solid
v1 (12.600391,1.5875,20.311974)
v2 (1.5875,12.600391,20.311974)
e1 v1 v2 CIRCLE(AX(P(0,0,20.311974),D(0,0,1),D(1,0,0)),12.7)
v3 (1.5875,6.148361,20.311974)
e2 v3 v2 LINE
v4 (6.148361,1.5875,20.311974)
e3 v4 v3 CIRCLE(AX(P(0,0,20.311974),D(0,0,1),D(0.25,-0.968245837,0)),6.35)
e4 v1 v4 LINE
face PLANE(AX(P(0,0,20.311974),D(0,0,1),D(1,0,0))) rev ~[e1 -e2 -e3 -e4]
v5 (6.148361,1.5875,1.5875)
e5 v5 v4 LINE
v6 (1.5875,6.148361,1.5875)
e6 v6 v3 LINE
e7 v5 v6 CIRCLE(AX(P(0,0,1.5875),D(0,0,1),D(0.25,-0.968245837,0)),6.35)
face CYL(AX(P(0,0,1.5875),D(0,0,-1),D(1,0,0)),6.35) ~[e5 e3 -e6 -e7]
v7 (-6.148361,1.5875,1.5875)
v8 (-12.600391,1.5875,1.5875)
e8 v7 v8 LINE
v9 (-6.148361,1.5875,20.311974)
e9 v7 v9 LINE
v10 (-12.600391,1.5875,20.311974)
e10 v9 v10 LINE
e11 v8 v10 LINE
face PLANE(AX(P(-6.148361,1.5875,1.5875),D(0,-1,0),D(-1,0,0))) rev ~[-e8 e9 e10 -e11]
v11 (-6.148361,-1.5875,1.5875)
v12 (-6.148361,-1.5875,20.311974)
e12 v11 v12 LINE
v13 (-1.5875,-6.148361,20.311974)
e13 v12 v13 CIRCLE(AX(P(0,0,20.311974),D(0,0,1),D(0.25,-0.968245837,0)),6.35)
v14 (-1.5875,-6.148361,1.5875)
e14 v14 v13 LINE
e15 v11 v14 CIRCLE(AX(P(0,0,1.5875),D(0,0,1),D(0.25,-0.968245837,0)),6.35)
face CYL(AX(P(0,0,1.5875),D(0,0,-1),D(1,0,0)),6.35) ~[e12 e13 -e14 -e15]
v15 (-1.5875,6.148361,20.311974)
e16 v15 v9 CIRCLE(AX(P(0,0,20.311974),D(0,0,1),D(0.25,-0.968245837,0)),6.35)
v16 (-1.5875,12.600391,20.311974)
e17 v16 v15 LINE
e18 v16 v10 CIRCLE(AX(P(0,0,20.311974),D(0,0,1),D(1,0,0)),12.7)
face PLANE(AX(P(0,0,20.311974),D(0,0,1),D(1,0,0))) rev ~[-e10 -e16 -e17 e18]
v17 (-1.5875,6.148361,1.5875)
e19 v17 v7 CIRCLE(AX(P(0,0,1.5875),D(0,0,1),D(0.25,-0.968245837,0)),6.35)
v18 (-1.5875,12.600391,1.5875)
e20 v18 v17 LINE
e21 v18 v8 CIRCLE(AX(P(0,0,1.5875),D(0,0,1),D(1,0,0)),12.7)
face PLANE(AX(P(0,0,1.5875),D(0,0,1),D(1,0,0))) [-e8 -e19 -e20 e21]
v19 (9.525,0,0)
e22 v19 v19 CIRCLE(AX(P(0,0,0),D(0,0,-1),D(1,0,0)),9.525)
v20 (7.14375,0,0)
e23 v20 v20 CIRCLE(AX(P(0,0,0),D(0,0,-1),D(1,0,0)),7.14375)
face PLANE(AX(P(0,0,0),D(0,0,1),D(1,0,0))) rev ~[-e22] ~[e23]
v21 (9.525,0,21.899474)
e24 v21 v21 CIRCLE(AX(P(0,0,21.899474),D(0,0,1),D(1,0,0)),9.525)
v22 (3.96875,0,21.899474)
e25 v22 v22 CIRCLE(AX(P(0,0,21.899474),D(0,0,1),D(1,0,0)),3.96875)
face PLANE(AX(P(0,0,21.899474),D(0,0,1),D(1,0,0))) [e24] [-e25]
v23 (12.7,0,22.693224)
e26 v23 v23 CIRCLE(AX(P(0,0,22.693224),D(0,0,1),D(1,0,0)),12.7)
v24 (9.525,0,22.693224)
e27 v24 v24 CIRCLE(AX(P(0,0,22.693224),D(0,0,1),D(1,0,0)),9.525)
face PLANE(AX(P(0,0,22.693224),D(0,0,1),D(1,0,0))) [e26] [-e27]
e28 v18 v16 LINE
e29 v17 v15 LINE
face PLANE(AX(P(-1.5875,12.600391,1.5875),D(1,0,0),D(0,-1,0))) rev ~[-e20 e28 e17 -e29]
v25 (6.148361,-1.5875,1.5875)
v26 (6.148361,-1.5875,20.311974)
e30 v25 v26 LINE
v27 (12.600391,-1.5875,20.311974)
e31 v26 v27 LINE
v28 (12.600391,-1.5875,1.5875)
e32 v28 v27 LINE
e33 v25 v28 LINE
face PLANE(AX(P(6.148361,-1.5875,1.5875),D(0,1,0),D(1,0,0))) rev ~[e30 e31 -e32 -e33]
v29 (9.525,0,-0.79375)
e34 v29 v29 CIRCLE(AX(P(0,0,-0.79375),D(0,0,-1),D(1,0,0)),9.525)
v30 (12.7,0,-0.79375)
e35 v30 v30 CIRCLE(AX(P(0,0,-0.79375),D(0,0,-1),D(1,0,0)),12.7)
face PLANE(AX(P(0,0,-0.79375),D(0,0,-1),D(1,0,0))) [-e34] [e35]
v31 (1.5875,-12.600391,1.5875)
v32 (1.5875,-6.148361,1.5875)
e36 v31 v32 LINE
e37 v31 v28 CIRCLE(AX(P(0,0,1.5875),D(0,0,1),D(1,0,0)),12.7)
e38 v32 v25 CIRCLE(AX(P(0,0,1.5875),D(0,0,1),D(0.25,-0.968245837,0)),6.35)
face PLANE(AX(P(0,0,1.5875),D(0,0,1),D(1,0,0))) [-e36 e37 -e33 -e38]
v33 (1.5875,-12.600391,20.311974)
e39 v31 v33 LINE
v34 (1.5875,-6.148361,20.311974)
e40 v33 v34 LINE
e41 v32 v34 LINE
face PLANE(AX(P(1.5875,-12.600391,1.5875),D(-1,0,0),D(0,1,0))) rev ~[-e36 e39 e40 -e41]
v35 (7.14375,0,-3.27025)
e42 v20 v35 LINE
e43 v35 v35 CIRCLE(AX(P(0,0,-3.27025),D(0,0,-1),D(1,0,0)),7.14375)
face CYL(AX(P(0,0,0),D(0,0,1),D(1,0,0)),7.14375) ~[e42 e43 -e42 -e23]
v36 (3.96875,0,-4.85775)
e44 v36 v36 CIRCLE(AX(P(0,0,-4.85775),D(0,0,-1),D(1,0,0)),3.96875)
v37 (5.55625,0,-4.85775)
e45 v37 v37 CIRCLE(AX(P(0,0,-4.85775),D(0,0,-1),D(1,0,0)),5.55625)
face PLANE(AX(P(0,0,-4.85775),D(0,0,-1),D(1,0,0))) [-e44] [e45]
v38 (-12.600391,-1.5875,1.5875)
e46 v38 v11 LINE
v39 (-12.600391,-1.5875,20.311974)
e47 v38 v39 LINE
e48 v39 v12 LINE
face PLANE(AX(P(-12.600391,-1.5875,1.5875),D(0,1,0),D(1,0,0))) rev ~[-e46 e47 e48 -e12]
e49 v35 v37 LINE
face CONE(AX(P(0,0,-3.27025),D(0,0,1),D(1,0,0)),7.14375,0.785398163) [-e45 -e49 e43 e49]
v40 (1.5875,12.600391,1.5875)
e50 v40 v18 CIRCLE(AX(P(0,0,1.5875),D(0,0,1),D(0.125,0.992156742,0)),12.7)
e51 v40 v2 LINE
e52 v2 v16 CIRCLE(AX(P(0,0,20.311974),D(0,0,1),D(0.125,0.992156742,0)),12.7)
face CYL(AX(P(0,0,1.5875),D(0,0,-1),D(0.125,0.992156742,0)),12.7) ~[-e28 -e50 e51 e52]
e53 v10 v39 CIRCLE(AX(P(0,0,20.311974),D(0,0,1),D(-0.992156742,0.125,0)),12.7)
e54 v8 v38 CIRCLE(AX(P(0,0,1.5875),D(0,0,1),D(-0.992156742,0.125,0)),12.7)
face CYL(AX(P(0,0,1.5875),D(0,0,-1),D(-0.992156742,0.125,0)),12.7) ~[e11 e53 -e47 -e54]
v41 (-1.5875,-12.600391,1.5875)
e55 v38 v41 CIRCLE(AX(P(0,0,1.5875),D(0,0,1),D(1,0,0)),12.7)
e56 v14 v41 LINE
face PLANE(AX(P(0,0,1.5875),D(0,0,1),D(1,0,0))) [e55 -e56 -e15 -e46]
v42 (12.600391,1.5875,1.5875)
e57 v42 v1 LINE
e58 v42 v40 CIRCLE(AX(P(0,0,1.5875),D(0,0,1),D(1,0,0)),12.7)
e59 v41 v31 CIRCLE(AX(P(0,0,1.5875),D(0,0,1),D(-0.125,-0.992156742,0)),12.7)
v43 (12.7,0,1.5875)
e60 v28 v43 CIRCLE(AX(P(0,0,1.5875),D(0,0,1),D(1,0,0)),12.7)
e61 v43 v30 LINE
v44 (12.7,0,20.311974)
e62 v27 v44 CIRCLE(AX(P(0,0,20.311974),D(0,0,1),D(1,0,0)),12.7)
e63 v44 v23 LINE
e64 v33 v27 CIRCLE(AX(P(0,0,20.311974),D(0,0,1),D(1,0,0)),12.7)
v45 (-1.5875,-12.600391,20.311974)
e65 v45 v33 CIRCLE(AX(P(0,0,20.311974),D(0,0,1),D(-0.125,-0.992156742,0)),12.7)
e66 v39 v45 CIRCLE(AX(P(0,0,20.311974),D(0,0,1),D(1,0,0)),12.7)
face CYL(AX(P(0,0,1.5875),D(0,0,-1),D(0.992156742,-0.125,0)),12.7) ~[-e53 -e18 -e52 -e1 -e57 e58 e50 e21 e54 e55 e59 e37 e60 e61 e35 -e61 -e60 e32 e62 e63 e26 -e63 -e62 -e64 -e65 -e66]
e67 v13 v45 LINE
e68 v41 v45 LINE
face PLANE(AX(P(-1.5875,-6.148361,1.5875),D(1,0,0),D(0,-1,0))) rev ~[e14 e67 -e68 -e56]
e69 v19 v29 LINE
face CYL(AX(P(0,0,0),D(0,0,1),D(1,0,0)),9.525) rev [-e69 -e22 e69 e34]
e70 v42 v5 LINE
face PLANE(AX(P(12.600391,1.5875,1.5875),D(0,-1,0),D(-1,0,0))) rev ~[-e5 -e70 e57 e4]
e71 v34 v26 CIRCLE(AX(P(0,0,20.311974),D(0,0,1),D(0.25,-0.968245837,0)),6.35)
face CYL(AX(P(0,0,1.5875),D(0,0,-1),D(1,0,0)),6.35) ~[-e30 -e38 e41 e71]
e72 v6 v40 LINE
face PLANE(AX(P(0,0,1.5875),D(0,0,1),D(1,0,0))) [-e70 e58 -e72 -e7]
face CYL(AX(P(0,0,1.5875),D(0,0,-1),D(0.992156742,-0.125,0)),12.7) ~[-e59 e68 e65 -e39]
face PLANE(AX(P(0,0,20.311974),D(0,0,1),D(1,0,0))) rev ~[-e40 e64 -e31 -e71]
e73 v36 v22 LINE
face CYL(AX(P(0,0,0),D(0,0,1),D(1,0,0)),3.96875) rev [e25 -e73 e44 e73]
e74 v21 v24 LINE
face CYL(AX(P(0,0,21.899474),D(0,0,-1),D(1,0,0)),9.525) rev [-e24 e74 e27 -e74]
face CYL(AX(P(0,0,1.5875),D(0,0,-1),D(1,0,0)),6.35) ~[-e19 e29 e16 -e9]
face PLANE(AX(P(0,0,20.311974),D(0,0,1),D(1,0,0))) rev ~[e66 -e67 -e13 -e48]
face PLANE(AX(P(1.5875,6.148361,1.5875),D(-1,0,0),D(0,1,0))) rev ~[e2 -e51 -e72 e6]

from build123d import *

# Parameters (mm, degrees)
F0_R             = 12.7
F0_R_2           = 3.96875
F1_DEPTH         = 1.5875
F2_R             = 12.7
F2_R_2           = 9.525
F3_DEPTH         = 0.79375
F4_R             = 6.35
F4_R_2           = 3.96875
F5_DEPTH         = 18.7244736
F6_R             = 12.7
F6_R_2           = 3.96875
F7_DEPTH         = 1.5875
F8_R             = 12.7
F8_R_2           = 9.525
F9_DEPTH         = 0.79375
F11_DEPTH        = 18.7244736
F11_COPIES_COUNT = 4
F12_R            = 7.14375
F12_R_2          = 3.96875
F13_DEPTH        = 4.85775
F14_SIZE         = 1.5875


# Not quite as in the source:
# - a length typed as a fraction of an inch, garbled in the dataset ("3 / 203.2 mm" for 3/8 in), is restored
# - a pattern or mirror of a feature is missing from the dataset's text; its kind, count and spacing are read off the source's solid


with BuildPart() as f1:
    # F0 (on Top) → F1 (new body)
    with BuildSketch(Plane.XY):
        Circle(F0_R)
        Circle(F0_R_2, mode=Mode.SUBTRACT)
    extrude(amount=F1_DEPTH)

    # F2 (on face) → F3 (join)
    with BuildSketch(Plane(origin=(0, 0, 0), x_dir=(1, 0, 0), z_dir=(0, 0, -1))):
        Circle(F2_R)
        Circle(F2_R_2, mode=Mode.SUBTRACT)
    extrude(amount=F3_DEPTH)

    # F4 (on face) → F5 (join)
    with BuildSketch(Plane.XY.offset(1.5875)):
        Circle(F4_R)
        Circle(F4_R_2, mode=Mode.SUBTRACT)
    extrude(amount=F5_DEPTH)

    # F6 (on face) → F7 (join)
    with BuildSketch(Plane.XY.offset(20.3119736)):
        Circle(F6_R)
        Circle(F6_R_2, mode=Mode.SUBTRACT)
    extrude(amount=F7_DEPTH)

    # F8 (on face) → F9 (join)
    with BuildSketch(Plane.XY.offset(21.8994736)):
        Circle(F8_R)
        Circle(F8_R_2, mode=Mode.SUBTRACT)
    extrude(amount=F9_DEPTH)

    # F10 (on face) → F11 (join, through all)
    with BuildSketch(Plane.XY.offset(1.5875)):
        with BuildLine():
            Line((1.5875, -12.6003906189), (1.5875, -6.1483610621))
            ThreePointArc((1.5875, -6.1483610621), (0, -6.35), (-1.5875, -6.1483610621))
            Line((-1.5875, -6.1483610621), (-1.5875, -12.6003906189))
            ThreePointArc((-1.5875, -12.6003906189), (0, -12.7), (1.5875, -12.6003906189))
        make_face()
    f11 = extrude(amount=F11_DEPTH)

    # F11_copies: F11 ×4 about axis
    f11_copies_axis = Axis((0, 0, 0), (0, 0, 1))
    for i in range(1, F11_COPIES_COUNT):
        add(f11.rotate(f11_copies_axis, i * 360 / F11_COPIES_COUNT))

    # F12 (on face) → F13 (join)
    with BuildSketch(Plane(origin=(0, 0, 0), x_dir=(1, 0, 0), z_dir=(0, 0, -1))):
        Circle(F12_R)
        Circle(F12_R_2, mode=Mode.SUBTRACT)
    extrude(amount=F13_DEPTH)

    # F14
    f14_edges = [f1.edges().sort_by_distance(p)[0] for p in [
        (-7.14375, 0, -4.85775),
    ]]
    chamfer(f14_edges, length=F14_SIZE)


solid = f1.part
